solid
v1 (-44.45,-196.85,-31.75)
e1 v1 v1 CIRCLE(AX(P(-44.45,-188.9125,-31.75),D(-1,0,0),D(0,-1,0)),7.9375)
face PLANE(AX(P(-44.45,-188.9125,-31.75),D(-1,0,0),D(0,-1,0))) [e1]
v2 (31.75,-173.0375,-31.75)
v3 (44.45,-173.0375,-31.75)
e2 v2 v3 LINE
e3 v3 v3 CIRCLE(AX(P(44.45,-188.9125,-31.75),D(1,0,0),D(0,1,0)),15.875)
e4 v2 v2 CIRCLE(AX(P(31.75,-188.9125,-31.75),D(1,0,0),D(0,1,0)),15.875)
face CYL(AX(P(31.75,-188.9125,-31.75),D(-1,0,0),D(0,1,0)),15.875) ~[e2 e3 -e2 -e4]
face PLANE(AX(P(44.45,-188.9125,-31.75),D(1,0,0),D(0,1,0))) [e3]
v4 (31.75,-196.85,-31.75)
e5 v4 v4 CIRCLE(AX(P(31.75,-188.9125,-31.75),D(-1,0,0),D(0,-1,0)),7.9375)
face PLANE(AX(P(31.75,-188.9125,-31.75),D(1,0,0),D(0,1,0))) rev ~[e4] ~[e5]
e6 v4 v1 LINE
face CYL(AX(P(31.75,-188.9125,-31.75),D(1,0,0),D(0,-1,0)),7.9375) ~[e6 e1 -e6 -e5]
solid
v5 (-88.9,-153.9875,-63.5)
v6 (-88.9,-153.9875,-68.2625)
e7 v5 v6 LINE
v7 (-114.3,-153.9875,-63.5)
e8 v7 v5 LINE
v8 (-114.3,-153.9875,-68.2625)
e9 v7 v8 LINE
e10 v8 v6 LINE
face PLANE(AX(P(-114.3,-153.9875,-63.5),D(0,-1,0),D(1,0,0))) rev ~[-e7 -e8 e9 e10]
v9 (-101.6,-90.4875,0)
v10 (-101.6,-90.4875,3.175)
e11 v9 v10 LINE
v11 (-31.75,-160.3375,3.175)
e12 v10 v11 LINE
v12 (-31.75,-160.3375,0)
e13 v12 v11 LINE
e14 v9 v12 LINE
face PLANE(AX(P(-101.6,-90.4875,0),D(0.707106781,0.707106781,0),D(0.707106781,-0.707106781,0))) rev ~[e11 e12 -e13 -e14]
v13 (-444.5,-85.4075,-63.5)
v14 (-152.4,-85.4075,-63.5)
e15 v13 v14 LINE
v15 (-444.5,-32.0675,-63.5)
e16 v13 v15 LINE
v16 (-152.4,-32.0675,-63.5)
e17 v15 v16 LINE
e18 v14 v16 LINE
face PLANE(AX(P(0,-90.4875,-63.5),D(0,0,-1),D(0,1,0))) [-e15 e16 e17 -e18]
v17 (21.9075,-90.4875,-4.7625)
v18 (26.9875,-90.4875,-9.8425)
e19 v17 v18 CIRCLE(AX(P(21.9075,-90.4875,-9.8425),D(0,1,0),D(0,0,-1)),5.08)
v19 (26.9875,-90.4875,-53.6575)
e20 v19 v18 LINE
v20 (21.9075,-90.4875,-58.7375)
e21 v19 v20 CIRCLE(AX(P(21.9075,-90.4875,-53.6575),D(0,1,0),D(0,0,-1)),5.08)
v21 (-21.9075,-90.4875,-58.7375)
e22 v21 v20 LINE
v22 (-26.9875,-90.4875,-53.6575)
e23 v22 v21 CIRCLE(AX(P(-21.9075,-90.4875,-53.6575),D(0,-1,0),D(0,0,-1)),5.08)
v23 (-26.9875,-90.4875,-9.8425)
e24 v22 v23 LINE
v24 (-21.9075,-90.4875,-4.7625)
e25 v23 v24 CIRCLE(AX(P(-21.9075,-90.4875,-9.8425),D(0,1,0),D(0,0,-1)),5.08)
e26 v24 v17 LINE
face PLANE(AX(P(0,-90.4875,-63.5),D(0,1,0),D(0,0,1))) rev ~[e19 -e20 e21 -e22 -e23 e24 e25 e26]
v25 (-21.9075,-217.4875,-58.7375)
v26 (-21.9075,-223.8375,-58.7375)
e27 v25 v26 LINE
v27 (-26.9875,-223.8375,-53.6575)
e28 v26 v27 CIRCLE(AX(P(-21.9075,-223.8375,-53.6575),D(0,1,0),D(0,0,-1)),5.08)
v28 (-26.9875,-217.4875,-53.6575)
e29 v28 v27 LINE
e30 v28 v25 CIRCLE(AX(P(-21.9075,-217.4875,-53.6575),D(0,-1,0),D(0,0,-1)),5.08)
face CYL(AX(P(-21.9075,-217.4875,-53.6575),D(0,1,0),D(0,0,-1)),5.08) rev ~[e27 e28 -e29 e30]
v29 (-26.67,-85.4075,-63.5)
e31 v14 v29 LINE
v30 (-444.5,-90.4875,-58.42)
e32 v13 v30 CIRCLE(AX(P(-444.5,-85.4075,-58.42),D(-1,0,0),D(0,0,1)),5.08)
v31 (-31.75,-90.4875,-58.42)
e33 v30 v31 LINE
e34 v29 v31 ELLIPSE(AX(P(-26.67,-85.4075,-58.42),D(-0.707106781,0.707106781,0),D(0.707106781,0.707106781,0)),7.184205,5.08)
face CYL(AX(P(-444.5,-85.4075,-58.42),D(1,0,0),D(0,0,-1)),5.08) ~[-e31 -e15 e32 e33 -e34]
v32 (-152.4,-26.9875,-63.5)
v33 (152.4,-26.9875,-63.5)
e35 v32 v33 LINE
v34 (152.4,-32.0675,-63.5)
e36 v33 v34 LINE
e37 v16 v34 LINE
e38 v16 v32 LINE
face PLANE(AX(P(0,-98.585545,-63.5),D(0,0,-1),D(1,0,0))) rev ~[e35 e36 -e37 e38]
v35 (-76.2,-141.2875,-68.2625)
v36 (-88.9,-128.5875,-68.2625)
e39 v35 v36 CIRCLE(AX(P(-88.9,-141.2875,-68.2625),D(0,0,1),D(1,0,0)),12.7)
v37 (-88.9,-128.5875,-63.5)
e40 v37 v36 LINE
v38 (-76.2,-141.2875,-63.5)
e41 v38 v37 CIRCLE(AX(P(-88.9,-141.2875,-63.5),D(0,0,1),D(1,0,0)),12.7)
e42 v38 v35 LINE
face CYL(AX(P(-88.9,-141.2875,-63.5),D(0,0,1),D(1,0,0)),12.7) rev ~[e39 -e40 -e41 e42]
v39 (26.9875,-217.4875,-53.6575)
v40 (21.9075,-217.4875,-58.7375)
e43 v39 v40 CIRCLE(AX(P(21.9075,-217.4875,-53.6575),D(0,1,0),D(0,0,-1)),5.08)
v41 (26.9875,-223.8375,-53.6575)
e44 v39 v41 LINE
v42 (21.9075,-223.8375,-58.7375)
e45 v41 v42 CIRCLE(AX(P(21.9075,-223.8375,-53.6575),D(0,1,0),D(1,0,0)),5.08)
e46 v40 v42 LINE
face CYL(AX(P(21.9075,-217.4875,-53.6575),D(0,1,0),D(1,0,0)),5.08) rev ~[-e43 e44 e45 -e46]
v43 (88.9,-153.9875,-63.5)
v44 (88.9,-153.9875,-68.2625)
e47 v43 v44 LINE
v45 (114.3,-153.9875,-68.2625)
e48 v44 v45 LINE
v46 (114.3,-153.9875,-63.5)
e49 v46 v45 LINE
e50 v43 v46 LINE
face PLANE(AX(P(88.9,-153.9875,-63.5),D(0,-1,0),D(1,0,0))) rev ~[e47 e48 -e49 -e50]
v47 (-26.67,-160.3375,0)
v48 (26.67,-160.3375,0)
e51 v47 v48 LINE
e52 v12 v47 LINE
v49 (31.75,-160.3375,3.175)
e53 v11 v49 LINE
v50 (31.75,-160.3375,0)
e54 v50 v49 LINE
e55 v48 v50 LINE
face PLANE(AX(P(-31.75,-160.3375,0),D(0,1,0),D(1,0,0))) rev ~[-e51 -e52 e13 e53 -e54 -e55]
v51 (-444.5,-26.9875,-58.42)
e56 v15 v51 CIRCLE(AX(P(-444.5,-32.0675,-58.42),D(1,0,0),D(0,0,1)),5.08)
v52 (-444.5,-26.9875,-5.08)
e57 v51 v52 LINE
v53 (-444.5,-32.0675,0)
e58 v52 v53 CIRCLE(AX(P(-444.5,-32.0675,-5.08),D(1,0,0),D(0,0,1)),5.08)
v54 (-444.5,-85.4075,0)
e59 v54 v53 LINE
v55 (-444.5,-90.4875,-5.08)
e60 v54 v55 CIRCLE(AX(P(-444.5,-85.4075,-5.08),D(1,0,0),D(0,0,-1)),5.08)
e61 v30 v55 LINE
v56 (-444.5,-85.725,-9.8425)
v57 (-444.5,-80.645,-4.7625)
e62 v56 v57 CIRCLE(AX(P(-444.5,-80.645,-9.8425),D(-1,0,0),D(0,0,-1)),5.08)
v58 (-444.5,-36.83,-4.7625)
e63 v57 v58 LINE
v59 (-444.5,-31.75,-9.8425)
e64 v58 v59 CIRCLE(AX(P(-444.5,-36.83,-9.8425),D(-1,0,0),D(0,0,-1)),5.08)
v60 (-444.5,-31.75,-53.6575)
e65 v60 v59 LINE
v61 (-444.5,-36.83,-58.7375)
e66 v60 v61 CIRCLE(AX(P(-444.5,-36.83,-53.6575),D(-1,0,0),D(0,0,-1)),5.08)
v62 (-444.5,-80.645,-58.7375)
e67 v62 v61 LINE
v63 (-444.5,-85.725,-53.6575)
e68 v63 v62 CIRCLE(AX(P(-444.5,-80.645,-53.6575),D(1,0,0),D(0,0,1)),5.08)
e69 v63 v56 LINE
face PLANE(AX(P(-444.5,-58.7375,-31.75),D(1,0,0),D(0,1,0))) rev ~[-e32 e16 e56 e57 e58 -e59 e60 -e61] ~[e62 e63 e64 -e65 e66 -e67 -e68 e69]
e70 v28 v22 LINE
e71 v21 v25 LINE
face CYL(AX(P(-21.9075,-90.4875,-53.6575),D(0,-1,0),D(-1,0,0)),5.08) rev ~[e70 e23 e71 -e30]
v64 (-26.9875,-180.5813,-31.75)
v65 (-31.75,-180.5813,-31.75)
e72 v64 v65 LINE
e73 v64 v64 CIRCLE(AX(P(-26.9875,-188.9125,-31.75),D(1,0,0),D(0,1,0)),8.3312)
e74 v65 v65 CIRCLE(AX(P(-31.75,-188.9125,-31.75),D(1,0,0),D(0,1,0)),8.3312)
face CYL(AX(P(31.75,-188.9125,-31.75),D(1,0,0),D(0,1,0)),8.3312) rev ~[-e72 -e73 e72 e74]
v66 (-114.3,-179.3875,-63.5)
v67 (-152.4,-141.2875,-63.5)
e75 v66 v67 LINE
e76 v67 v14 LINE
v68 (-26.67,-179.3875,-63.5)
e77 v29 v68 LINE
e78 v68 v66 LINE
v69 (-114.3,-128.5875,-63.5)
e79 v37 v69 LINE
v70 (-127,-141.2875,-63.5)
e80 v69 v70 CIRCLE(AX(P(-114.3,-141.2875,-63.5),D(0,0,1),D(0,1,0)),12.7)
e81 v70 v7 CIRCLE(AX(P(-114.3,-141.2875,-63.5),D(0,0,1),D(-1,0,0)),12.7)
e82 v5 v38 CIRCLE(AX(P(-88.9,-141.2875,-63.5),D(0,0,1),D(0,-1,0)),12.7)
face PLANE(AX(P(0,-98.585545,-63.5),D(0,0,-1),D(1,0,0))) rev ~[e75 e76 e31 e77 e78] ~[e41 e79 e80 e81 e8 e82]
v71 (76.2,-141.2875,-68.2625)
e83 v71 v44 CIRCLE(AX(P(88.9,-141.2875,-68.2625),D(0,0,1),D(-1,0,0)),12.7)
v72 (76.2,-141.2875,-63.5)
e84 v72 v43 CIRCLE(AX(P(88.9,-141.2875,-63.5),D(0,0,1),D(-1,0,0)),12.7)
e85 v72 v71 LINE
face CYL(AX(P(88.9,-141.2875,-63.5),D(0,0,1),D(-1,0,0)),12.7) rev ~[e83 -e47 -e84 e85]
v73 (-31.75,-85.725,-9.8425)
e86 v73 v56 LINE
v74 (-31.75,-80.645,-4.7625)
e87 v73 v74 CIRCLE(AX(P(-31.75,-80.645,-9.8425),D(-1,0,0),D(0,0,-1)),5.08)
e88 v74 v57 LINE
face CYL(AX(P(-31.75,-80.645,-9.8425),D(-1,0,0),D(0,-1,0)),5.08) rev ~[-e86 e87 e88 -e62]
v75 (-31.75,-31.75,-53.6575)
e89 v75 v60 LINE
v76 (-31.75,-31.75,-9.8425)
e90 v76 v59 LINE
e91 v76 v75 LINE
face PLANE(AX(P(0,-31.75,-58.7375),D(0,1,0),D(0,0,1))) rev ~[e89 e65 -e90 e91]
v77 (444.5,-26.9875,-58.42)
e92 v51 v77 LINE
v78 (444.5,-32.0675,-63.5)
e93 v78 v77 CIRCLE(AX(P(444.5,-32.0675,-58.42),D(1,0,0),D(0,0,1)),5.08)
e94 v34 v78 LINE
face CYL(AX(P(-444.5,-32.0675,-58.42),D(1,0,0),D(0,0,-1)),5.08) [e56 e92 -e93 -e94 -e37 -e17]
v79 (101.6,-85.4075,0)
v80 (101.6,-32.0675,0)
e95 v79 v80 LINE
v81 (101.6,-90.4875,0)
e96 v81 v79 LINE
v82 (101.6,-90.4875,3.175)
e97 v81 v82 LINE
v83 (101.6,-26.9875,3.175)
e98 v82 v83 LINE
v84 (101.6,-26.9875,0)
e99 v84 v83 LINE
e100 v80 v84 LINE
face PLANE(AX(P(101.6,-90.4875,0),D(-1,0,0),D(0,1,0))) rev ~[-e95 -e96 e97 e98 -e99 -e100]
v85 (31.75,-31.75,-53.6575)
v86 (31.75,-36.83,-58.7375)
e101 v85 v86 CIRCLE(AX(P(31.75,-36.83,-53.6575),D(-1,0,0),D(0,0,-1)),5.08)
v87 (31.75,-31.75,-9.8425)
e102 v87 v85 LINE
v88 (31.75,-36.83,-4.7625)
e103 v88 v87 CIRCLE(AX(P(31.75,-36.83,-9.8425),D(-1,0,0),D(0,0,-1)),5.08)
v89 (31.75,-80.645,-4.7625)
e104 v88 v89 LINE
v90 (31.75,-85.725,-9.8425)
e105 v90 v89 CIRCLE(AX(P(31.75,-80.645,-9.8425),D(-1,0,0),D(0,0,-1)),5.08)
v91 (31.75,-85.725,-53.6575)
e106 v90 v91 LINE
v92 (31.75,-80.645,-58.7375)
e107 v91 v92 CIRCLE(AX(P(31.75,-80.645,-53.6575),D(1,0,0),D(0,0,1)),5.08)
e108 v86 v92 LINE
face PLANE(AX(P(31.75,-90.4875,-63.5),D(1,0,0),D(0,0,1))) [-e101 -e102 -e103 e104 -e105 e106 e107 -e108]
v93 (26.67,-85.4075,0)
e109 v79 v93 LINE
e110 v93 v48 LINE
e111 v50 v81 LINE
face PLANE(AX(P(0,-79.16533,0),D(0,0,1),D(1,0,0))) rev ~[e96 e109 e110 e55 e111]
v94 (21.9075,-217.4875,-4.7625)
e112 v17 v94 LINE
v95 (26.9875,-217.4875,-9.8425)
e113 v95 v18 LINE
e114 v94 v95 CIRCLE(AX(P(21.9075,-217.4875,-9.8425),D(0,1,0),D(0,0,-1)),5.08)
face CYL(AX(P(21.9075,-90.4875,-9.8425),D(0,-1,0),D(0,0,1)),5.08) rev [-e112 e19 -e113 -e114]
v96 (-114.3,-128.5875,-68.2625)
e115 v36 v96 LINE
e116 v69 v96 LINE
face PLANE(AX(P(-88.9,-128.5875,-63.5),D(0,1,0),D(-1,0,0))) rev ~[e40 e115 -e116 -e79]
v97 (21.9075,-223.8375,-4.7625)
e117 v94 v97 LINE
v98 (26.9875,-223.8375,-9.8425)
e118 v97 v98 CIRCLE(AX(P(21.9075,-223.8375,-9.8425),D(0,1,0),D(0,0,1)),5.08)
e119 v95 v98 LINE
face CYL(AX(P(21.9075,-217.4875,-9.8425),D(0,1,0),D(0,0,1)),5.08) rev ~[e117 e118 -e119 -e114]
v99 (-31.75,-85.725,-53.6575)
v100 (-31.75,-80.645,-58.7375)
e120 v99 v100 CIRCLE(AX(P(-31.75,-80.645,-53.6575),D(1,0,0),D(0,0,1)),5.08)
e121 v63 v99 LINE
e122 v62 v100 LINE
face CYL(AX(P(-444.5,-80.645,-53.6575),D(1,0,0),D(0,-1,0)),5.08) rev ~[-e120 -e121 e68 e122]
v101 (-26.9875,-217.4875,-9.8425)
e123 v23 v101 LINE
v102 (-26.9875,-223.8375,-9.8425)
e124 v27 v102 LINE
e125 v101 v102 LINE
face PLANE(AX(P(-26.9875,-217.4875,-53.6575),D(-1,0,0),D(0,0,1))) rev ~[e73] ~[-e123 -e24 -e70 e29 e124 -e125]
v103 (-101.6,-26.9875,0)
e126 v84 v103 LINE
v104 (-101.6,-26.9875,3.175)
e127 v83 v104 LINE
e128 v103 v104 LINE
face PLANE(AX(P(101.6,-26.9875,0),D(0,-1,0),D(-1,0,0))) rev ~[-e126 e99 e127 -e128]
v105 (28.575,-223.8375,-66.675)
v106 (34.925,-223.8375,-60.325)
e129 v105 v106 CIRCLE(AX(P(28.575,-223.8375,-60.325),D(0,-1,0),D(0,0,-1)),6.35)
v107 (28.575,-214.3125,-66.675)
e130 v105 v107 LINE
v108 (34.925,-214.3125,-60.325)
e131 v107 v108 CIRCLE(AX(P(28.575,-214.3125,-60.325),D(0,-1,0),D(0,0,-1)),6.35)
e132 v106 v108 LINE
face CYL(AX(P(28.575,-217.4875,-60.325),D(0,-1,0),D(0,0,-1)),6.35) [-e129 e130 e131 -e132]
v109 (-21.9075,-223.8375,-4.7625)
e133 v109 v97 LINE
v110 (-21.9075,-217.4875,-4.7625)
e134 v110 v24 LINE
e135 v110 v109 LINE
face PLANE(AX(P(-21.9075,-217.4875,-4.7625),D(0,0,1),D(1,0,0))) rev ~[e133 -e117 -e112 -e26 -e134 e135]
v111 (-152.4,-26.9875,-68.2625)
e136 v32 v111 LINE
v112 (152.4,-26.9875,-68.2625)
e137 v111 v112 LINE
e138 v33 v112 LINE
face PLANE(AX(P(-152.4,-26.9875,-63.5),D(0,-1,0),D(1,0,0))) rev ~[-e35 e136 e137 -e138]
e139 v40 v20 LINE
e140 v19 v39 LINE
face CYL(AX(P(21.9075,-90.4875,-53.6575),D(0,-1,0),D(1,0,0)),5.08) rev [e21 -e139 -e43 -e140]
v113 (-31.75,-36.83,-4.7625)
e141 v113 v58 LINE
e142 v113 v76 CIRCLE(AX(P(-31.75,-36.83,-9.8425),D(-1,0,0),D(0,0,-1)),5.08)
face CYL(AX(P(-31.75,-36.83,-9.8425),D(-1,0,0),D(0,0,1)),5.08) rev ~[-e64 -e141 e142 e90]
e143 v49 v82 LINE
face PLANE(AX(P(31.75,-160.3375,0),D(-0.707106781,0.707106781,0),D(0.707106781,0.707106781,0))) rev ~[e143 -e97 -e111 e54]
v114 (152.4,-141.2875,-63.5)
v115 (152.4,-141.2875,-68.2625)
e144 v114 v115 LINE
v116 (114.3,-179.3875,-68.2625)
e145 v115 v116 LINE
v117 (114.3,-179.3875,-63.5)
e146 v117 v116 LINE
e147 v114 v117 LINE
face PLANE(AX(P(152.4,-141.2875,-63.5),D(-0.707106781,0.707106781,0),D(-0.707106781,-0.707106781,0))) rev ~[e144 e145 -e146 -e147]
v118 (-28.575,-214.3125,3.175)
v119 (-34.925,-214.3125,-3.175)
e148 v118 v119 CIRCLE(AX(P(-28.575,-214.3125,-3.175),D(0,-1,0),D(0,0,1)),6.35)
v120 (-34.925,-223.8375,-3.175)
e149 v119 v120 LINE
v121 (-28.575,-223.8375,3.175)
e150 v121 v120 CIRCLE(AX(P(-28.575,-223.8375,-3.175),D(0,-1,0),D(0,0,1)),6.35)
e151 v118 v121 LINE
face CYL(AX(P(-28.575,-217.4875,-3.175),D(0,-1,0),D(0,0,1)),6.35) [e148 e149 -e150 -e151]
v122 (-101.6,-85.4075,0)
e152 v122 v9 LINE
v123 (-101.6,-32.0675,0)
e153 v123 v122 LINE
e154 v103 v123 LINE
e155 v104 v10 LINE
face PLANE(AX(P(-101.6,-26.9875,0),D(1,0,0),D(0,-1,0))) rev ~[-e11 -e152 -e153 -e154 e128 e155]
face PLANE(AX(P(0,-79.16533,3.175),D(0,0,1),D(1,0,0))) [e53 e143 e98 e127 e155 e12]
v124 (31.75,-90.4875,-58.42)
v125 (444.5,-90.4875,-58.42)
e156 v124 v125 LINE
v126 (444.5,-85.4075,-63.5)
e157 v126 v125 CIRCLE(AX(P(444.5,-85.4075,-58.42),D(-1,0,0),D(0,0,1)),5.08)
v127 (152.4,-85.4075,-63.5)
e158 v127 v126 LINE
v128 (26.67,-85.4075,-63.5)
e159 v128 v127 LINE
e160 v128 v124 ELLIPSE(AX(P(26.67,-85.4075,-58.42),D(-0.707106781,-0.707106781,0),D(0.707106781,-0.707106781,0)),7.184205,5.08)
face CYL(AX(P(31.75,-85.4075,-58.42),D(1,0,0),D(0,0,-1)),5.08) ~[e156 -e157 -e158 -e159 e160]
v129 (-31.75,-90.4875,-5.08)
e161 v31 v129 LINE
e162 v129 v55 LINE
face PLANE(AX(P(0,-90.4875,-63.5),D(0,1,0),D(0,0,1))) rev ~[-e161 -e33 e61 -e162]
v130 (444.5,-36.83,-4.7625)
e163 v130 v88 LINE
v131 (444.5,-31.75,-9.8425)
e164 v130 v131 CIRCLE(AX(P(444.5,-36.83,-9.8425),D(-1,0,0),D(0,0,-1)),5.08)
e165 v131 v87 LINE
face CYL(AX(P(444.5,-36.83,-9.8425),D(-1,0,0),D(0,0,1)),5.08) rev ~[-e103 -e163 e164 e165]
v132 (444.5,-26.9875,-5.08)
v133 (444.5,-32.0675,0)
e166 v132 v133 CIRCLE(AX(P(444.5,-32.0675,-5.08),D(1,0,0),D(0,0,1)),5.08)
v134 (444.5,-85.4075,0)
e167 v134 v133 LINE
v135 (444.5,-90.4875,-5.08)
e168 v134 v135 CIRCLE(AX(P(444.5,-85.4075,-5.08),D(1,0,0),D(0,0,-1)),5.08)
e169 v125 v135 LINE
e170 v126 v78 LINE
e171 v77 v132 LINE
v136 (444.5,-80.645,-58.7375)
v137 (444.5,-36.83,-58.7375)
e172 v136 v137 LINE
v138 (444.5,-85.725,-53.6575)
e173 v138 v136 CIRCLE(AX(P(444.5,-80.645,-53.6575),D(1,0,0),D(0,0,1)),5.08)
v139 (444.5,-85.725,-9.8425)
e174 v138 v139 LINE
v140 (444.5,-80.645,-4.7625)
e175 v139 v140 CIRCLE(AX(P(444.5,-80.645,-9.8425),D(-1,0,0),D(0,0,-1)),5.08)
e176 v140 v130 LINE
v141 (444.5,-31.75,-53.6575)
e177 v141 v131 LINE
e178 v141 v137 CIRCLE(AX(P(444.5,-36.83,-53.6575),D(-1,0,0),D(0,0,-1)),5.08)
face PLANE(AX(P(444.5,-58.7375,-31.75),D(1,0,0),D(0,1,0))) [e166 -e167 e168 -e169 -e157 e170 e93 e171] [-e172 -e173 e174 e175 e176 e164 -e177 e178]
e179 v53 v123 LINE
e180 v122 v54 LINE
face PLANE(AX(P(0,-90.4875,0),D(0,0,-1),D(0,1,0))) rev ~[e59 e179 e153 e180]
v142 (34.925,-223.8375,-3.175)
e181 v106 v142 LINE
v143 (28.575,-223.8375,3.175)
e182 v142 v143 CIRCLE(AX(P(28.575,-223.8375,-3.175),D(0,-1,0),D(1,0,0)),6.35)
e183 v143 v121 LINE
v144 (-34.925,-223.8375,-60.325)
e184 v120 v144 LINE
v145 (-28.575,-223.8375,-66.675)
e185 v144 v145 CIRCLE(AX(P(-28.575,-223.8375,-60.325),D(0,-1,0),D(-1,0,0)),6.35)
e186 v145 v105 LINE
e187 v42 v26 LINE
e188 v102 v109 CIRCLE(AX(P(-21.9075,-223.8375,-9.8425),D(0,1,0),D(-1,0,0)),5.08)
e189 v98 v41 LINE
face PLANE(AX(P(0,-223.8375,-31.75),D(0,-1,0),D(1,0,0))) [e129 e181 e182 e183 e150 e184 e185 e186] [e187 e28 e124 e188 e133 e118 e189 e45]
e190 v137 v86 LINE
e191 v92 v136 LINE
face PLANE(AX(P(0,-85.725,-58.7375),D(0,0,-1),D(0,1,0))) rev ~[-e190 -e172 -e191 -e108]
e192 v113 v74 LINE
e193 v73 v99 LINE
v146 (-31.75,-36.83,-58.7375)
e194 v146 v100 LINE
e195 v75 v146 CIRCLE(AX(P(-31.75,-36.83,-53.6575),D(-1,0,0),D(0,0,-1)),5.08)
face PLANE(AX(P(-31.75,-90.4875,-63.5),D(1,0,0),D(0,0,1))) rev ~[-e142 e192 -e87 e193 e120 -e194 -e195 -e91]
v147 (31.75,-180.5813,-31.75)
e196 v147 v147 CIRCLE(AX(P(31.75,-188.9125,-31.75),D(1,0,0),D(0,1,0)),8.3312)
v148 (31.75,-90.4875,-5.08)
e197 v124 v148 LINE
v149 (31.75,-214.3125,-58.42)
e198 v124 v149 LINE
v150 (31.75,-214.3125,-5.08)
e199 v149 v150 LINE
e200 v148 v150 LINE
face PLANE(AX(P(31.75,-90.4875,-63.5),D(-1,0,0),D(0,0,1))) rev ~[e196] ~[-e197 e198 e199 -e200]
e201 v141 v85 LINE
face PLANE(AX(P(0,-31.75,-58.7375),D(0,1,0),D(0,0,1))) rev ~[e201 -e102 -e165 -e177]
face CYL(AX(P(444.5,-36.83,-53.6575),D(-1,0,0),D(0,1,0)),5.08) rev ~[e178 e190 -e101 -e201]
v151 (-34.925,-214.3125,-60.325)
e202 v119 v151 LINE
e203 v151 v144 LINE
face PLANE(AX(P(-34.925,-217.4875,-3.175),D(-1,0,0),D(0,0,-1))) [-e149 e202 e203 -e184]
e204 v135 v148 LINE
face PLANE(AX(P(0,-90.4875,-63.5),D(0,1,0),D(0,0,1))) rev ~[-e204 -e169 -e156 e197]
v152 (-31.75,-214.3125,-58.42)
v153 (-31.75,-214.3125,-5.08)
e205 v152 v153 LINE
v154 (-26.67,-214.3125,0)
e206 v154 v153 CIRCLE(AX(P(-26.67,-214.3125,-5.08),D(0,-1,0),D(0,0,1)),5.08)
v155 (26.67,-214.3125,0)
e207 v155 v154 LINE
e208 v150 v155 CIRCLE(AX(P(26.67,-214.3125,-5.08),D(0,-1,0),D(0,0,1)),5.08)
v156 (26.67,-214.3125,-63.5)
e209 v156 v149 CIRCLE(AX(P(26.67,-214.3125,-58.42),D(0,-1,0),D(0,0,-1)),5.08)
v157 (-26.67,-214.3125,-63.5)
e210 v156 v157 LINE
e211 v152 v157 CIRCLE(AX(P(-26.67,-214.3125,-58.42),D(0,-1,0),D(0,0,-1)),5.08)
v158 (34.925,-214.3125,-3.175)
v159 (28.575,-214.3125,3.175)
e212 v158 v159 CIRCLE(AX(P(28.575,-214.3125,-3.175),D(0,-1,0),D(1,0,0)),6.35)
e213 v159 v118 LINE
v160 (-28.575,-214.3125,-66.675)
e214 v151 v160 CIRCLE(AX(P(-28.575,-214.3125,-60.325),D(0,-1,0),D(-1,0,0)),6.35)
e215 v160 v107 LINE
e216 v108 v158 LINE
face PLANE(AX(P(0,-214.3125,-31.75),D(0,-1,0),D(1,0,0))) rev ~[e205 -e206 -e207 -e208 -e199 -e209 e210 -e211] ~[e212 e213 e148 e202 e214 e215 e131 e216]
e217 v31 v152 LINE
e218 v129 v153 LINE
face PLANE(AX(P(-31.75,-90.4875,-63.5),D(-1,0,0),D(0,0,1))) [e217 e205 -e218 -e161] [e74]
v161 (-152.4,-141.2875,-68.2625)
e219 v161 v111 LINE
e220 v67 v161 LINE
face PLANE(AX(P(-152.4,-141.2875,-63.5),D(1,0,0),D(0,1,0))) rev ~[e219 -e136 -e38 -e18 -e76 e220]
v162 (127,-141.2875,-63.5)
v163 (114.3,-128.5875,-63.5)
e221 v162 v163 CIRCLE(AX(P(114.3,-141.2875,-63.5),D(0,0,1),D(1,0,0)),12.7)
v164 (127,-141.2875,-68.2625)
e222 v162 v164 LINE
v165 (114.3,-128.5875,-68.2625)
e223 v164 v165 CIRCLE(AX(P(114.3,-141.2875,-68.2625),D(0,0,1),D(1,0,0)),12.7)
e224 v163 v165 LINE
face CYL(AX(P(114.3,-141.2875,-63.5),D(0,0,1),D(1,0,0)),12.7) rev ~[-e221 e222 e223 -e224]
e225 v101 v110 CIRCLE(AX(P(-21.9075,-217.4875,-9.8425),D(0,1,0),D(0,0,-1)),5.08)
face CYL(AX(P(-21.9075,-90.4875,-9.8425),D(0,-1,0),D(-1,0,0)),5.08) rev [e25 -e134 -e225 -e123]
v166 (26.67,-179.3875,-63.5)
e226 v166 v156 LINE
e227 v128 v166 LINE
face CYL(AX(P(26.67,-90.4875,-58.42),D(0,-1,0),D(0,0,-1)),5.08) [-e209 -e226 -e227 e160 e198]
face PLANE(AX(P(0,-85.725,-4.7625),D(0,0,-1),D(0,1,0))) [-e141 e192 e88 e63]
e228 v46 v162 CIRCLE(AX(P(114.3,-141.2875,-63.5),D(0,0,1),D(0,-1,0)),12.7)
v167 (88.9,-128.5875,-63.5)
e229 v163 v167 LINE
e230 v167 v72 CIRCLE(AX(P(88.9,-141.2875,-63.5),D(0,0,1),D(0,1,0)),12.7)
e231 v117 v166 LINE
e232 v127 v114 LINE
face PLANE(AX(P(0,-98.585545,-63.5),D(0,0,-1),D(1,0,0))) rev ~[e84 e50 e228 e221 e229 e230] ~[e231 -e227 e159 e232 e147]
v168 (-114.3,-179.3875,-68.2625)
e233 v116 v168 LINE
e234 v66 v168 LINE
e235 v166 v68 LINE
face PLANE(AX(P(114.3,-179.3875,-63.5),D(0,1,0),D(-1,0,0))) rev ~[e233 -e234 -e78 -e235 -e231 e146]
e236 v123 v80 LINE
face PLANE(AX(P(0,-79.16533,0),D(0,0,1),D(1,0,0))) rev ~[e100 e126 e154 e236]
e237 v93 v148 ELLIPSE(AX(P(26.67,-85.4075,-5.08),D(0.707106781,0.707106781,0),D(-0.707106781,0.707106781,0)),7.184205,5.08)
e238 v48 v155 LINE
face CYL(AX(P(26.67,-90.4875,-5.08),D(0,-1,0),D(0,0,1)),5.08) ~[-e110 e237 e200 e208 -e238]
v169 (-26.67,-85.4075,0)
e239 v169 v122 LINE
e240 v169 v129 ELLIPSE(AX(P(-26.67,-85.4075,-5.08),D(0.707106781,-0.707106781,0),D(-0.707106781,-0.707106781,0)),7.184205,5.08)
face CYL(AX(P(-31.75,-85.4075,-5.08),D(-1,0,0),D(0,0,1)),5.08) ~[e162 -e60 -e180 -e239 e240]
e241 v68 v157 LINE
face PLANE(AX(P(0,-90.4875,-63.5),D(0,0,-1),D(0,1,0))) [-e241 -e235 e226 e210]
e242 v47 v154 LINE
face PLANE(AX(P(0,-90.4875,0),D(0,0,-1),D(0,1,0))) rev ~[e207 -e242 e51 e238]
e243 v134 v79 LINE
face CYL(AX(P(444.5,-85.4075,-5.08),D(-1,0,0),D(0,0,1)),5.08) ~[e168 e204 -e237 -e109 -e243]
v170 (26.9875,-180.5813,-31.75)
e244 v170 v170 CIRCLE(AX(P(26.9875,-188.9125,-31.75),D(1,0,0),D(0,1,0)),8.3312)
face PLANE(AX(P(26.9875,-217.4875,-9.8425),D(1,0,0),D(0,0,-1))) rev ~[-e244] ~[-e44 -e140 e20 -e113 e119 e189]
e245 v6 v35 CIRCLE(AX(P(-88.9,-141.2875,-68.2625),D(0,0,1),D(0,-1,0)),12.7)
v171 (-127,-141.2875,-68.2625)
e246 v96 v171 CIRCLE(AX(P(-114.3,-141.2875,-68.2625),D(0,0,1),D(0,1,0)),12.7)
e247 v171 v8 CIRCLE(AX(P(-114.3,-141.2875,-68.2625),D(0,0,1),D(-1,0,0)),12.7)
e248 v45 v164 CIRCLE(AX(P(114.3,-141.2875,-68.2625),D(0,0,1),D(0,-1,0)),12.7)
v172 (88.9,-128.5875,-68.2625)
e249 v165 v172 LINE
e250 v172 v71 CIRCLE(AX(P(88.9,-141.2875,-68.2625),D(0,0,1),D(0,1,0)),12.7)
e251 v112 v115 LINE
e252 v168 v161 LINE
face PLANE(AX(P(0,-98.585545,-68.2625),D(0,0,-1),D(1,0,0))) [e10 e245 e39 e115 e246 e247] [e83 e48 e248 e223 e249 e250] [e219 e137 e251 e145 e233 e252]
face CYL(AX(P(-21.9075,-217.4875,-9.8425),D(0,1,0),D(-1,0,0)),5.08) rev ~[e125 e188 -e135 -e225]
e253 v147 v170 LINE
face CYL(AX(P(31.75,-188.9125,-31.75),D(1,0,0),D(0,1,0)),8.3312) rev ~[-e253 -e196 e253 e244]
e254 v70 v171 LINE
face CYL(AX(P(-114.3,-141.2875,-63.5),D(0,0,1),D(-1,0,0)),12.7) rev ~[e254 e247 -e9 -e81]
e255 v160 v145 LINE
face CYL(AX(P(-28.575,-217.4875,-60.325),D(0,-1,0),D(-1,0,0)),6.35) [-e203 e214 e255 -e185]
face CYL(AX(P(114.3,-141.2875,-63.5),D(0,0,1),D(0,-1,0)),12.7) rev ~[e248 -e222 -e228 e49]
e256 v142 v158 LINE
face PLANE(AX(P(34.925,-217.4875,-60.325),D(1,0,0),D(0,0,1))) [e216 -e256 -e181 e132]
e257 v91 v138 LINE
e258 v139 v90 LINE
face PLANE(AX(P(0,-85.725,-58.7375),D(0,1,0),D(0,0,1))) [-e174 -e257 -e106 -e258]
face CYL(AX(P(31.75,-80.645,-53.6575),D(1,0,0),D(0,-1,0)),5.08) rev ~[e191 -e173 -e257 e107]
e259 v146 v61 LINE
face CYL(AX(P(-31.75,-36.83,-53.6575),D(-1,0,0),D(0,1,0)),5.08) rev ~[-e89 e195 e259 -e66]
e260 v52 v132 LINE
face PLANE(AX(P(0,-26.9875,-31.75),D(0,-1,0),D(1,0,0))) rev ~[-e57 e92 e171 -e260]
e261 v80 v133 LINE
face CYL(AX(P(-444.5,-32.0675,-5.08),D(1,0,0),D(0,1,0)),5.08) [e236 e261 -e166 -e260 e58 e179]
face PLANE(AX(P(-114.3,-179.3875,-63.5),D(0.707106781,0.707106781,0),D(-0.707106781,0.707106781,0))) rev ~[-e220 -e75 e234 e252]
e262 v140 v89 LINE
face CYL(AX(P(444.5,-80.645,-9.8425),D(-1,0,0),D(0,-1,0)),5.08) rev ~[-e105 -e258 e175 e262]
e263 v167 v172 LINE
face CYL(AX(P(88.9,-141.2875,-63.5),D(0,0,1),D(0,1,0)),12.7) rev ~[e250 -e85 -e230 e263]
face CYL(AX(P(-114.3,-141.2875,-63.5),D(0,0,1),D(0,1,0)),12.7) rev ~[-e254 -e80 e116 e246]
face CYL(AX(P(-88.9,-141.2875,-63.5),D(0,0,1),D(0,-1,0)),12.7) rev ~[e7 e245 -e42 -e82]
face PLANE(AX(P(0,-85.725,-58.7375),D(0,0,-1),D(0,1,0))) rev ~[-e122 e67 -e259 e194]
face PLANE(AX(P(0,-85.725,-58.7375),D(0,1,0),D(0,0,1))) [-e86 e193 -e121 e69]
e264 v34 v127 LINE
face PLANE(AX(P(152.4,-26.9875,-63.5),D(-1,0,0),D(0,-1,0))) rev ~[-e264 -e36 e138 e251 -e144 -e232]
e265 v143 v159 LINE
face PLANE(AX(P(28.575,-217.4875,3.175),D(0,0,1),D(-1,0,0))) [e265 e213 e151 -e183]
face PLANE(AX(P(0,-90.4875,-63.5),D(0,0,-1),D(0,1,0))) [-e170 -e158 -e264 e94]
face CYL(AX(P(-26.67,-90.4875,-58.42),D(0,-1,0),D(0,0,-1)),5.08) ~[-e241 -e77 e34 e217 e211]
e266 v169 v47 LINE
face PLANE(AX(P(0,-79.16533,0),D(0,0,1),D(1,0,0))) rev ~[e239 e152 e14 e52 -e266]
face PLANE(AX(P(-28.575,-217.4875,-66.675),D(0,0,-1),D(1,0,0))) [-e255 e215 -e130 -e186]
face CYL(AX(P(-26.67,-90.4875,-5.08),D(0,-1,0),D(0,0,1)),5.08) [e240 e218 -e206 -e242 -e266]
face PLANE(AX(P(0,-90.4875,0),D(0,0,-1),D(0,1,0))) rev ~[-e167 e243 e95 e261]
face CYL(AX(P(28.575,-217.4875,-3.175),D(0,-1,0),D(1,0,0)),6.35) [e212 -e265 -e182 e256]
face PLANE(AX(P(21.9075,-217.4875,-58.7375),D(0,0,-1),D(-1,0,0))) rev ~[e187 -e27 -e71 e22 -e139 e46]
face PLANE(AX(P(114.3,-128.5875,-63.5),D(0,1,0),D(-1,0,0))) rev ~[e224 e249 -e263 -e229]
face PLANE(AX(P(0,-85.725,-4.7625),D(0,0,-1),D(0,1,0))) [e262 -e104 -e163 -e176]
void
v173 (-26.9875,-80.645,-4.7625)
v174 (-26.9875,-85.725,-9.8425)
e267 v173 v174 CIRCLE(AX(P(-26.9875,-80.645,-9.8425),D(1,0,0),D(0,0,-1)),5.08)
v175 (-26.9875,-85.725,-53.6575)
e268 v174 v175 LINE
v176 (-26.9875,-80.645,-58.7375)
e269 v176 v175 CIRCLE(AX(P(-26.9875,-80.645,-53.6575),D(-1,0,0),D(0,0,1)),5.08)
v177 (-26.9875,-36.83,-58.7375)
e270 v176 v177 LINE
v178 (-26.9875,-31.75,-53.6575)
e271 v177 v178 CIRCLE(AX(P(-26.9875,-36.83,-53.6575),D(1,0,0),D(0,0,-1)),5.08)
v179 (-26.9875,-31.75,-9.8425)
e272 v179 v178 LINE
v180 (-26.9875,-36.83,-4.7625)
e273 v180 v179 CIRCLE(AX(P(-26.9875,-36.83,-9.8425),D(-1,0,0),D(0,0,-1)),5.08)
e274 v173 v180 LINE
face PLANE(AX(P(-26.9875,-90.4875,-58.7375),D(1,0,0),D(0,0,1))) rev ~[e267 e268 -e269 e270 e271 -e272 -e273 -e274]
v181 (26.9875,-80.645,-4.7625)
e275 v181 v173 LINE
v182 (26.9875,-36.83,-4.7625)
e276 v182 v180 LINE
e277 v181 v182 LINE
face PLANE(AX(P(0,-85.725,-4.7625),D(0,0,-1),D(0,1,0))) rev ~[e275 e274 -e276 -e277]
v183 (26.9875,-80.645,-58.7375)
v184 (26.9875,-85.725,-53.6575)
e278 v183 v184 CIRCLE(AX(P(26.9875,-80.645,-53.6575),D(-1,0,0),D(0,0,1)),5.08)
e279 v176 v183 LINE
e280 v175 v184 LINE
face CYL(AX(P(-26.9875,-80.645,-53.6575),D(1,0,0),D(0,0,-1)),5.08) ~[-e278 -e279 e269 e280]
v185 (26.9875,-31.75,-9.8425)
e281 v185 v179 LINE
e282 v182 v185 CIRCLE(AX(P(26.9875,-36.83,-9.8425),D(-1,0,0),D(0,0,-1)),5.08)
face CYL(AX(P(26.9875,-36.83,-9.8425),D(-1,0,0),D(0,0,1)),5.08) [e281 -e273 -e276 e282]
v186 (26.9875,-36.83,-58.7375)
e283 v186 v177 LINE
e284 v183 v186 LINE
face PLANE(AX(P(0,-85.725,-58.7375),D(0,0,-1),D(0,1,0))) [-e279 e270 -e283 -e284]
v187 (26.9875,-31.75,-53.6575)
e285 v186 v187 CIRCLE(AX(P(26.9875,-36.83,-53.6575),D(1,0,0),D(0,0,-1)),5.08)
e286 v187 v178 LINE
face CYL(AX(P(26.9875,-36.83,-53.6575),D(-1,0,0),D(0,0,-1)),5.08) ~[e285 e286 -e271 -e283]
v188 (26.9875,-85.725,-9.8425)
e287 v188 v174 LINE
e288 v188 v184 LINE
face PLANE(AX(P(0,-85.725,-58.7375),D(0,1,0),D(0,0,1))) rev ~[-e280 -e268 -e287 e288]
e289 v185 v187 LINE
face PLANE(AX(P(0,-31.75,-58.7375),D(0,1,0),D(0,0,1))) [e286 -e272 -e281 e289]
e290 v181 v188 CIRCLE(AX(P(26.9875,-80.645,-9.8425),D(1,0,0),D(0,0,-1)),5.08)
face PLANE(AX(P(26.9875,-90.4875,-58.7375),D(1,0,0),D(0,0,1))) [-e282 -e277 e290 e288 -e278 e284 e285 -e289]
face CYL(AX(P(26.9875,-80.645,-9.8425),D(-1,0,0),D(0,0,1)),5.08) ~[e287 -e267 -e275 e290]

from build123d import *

# Parameters (mm, degrees)
F0_W           = 63.5
F0_H           = 63.5
F0_W_2         = 53.975
F0_H_2         = 53.975
F1_DEPTH       = 444.5
F2_W           = 63.5
F2_H           = 63.5
F2_W_2         = 53.975
F2_H_2         = 53.975
F3_DEPTH       = 127
F3_DEPTH_BACK  = 63.5
F4_R           = 5.08
F6_DEPTH       = 3.175
F8_DEPTH       = 4.7625
F10_DEPTH      = 6.35
F10_DEPTH_BACK = 3.175
F12_R          = 8.3312
F13_DEPTH      = 476.251
F14_R          = 15.875
F15_DEPTH      = 12.7
F16_R          = 7.9375
F17_DEPTH      = 76.2


with BuildPart() as f1:
    # F0 (on Right) → F1 (new body, symmetric)
    with BuildSketch(Plane.YZ):
        with Locations((-58.7375, -31.75)):
            Rectangle(F0_W, F0_H)
        with Locations((-58.7375, -31.75)):
            Rectangle(F0_W_2, F0_H_2, mode=Mode.SUBTRACT)
    extrude(amount=F1_DEPTH, both=True)

    # F2 (on face) → F3 (join, two sides)
    with BuildSketch(Plane.XZ.offset(90.4875)) as f3_sk:
        with Locations((0, -31.75)):
            Rectangle(F2_W, F2_H)
        with Locations((0, -31.75)):
            Rectangle(F2_W_2, F2_H_2, mode=Mode.SUBTRACT)
    extrude(amount=F3_DEPTH)
    extrude(f3_sk.sketch, amount=-F3_DEPTH_BACK)

    # F4
    f4_edges = [f1.edges().sort_by_distance(p)[0] for p in [
        (-238.125, -90.4875, 0),
        (238.125, -90.4875, 0),
        (0, -26.9875, 0),
        (0, -26.9875, -63.5),
        (-238.125, -90.4875, -63.5),
        (238.125, -90.4875, -63.5),
        (0, -31.75, -4.7625),
        (0, -85.725, -4.7625),
        (0, -31.75, -58.7375),
        (0, -85.725, -58.7375),
        (-31.75, -153.9875, 0),
        (31.75, -153.9875, 0),
        (31.75, -153.9875, -63.5),
        (-31.75, -153.9875, -63.5),
        (-26.9875, -153.9875, -4.7625),
        (26.9875, -153.9875, -4.7625),
        (-26.9875, -153.9875, -58.7375),
        (26.9875, -153.9875, -58.7375),
        (238.125, -85.725, -58.7375),
        (238.125, -85.725, -4.7625),
        (238.125, -31.75, -58.7375),
        (238.125, -31.75, -4.7625),
        (-238.125, -85.725, -4.7625),
        (-238.125, -85.725, -58.7375),
        (-238.125, -31.75, -58.7375),
        (-238.125, -31.75, -4.7625),
    ]]
    fillet(f4_edges, radius=F4_R)

    # F5 (on face) → F6 (join)
    with BuildSketch(Plane.XY):
        Polygon((101.6, -26.9875), (-101.6, -26.9875), (-101.6, -90.4875), (-31.75, -90.4875), (-31.75, -160.3375), (31.75, -160.3375), (31.75, -90.4875), (101.6, -90.4875), align=None)
        Polygon((-31.75, -90.4875), (-101.6, -90.4875), (-31.75, -160.3375), align=None)
        Polygon((31.75, -160.3375), (101.6, -90.4875), (31.75, -90.4875), align=None)
    extrude(amount=F6_DEPTH)

    # F7 (on face) → F8 (join)
    with BuildSketch(Plane(origin=(0, 0, -63.5), x_dir=(1, 0, 0), z_dir=(0, 0, -1))):
        Polygon((-152.4, 26.9875), (152.4, 26.9875), (152.4, 141.2875), (114.3, 179.3875), (-114.3, 179.3875), (-152.4, 141.2875), align=None)
        with BuildLine():
            ThreePointArc((-127, 141.2875), (-123.2802561211, 150.2677561211), (-114.3, 153.9875))
            Line((-114.3, 153.9875), (-88.9, 153.9875))
            ThreePointArc((-88.9, 153.9875), (-79.9197438789, 150.2677561211), (-76.2, 141.2875))
            ThreePointArc((-76.2, 141.2875), (-79.9197438789, 132.3072438789), (-88.9, 128.5875))
            Line((-88.9, 128.5875), (-114.3, 128.5875))
            ThreePointArc((-114.3, 128.5875), (-123.2802561211, 132.3072438789), (-127, 141.2875))
        make_face(mode=Mode.SUBTRACT)
        with BuildLine():
            Line((114.3, 128.5875), (88.9, 128.5875))
            ThreePointArc((88.9, 128.5875), (79.9197438789, 132.3072438789), (76.2, 141.2875))
            ThreePointArc((76.2, 141.2875), (79.9197438789, 150.2677561211), (88.9, 153.9875))
            Line((88.9, 153.9875), (114.3, 153.9875))
            ThreePointArc((114.3, 153.9875), (123.2802561211, 150.2677561211), (127, 141.2875))
            ThreePointArc((127, 141.2875), (123.2802561211, 132.3072438789), (114.3, 128.5875))
        make_face(mode=Mode.SUBTRACT)
    extrude(amount=F8_DEPTH)

    # F9 (on face) → F10 (join, two sides)
    with BuildSketch(Plane.XZ.offset(217.4875)) as f10_sk:
        with BuildLine():
            Line((28.575, 3.175), (-28.575, 3.175))
            ThreePointArc((-28.575, 3.175), (-33.0651280605, 1.3151280605), (-34.925, -3.175))
            Line((-34.925, -3.175), (-34.925, -60.325))
            ThreePointArc((-34.925, -60.325), (-33.0651280605, -64.8151280605), (-28.575, -66.675))
            Line((-28.575, -66.675), (28.575, -66.675))
            ThreePointArc((28.575, -66.675), (33.0651280605, -64.8151280605), (34.925, -60.325))
            Line((34.925, -60.325), (34.925, -3.175))
            ThreePointArc((34.925, -3.175), (33.0651280605, 1.3151280605), (28.575, 3.175))
        make_face()
        with BuildLine():
            ThreePointArc((-26.9875, -9.8425), (-25.4996024484, -6.2503975516), (-21.9075, -4.7625))
            Line((-21.9075, -4.7625), (21.9075, -4.7625))
            ThreePointArc((21.9075, -4.7625), (25.4996024484, -6.2503975516), (26.9875, -9.8425))
            Line((26.9875, -9.8425), (26.9875, -53.6575))
            ThreePointArc((26.9875, -53.6575), (25.4996024484, -57.2496024484), (21.9075, -58.7375))
            Line((21.9075, -58.7375), (-21.9075, -58.7375))
            ThreePointArc((-21.9075, -58.7375), (-25.4996024484, -57.2496024484), (-26.9875, -53.6575))
            Line((-26.9875, -53.6575), (-26.9875, -9.8425))
        make_face(mode=Mode.SUBTRACT)
    extrude(amount=F10_DEPTH)
    extrude(f10_sk.sketch, amount=-F10_DEPTH_BACK)

    # F12 (on face) → F13 (cut, through all)
    with BuildSketch(Plane.YZ.offset(31.75)):
        with Locations((-188.9125, -31.75)):
            Circle(F12_R)
    extrude(amount=-F13_DEPTH, mode=Mode.SUBTRACT)


with BuildPart() as f15:
    # F14 (on face) → F15 (new body)
    with BuildSketch(Plane.YZ.offset(31.75)):
        with Locations((-188.9125, -31.75)):
            Circle(F14_R)
    extrude(amount=F15_DEPTH)

    # F16 (on face) → F17 (join)
    with BuildSketch(Plane(origin=(31.75, 0, 0), x_dir=(0, -1, 0), z_dir=(-1, 0, 0))):
        with Locations((188.9125, -31.75)):
            Circle(F16_R)
    extrude(amount=F17_DEPTH)


solid = Compound([f1.part, f15.part])
